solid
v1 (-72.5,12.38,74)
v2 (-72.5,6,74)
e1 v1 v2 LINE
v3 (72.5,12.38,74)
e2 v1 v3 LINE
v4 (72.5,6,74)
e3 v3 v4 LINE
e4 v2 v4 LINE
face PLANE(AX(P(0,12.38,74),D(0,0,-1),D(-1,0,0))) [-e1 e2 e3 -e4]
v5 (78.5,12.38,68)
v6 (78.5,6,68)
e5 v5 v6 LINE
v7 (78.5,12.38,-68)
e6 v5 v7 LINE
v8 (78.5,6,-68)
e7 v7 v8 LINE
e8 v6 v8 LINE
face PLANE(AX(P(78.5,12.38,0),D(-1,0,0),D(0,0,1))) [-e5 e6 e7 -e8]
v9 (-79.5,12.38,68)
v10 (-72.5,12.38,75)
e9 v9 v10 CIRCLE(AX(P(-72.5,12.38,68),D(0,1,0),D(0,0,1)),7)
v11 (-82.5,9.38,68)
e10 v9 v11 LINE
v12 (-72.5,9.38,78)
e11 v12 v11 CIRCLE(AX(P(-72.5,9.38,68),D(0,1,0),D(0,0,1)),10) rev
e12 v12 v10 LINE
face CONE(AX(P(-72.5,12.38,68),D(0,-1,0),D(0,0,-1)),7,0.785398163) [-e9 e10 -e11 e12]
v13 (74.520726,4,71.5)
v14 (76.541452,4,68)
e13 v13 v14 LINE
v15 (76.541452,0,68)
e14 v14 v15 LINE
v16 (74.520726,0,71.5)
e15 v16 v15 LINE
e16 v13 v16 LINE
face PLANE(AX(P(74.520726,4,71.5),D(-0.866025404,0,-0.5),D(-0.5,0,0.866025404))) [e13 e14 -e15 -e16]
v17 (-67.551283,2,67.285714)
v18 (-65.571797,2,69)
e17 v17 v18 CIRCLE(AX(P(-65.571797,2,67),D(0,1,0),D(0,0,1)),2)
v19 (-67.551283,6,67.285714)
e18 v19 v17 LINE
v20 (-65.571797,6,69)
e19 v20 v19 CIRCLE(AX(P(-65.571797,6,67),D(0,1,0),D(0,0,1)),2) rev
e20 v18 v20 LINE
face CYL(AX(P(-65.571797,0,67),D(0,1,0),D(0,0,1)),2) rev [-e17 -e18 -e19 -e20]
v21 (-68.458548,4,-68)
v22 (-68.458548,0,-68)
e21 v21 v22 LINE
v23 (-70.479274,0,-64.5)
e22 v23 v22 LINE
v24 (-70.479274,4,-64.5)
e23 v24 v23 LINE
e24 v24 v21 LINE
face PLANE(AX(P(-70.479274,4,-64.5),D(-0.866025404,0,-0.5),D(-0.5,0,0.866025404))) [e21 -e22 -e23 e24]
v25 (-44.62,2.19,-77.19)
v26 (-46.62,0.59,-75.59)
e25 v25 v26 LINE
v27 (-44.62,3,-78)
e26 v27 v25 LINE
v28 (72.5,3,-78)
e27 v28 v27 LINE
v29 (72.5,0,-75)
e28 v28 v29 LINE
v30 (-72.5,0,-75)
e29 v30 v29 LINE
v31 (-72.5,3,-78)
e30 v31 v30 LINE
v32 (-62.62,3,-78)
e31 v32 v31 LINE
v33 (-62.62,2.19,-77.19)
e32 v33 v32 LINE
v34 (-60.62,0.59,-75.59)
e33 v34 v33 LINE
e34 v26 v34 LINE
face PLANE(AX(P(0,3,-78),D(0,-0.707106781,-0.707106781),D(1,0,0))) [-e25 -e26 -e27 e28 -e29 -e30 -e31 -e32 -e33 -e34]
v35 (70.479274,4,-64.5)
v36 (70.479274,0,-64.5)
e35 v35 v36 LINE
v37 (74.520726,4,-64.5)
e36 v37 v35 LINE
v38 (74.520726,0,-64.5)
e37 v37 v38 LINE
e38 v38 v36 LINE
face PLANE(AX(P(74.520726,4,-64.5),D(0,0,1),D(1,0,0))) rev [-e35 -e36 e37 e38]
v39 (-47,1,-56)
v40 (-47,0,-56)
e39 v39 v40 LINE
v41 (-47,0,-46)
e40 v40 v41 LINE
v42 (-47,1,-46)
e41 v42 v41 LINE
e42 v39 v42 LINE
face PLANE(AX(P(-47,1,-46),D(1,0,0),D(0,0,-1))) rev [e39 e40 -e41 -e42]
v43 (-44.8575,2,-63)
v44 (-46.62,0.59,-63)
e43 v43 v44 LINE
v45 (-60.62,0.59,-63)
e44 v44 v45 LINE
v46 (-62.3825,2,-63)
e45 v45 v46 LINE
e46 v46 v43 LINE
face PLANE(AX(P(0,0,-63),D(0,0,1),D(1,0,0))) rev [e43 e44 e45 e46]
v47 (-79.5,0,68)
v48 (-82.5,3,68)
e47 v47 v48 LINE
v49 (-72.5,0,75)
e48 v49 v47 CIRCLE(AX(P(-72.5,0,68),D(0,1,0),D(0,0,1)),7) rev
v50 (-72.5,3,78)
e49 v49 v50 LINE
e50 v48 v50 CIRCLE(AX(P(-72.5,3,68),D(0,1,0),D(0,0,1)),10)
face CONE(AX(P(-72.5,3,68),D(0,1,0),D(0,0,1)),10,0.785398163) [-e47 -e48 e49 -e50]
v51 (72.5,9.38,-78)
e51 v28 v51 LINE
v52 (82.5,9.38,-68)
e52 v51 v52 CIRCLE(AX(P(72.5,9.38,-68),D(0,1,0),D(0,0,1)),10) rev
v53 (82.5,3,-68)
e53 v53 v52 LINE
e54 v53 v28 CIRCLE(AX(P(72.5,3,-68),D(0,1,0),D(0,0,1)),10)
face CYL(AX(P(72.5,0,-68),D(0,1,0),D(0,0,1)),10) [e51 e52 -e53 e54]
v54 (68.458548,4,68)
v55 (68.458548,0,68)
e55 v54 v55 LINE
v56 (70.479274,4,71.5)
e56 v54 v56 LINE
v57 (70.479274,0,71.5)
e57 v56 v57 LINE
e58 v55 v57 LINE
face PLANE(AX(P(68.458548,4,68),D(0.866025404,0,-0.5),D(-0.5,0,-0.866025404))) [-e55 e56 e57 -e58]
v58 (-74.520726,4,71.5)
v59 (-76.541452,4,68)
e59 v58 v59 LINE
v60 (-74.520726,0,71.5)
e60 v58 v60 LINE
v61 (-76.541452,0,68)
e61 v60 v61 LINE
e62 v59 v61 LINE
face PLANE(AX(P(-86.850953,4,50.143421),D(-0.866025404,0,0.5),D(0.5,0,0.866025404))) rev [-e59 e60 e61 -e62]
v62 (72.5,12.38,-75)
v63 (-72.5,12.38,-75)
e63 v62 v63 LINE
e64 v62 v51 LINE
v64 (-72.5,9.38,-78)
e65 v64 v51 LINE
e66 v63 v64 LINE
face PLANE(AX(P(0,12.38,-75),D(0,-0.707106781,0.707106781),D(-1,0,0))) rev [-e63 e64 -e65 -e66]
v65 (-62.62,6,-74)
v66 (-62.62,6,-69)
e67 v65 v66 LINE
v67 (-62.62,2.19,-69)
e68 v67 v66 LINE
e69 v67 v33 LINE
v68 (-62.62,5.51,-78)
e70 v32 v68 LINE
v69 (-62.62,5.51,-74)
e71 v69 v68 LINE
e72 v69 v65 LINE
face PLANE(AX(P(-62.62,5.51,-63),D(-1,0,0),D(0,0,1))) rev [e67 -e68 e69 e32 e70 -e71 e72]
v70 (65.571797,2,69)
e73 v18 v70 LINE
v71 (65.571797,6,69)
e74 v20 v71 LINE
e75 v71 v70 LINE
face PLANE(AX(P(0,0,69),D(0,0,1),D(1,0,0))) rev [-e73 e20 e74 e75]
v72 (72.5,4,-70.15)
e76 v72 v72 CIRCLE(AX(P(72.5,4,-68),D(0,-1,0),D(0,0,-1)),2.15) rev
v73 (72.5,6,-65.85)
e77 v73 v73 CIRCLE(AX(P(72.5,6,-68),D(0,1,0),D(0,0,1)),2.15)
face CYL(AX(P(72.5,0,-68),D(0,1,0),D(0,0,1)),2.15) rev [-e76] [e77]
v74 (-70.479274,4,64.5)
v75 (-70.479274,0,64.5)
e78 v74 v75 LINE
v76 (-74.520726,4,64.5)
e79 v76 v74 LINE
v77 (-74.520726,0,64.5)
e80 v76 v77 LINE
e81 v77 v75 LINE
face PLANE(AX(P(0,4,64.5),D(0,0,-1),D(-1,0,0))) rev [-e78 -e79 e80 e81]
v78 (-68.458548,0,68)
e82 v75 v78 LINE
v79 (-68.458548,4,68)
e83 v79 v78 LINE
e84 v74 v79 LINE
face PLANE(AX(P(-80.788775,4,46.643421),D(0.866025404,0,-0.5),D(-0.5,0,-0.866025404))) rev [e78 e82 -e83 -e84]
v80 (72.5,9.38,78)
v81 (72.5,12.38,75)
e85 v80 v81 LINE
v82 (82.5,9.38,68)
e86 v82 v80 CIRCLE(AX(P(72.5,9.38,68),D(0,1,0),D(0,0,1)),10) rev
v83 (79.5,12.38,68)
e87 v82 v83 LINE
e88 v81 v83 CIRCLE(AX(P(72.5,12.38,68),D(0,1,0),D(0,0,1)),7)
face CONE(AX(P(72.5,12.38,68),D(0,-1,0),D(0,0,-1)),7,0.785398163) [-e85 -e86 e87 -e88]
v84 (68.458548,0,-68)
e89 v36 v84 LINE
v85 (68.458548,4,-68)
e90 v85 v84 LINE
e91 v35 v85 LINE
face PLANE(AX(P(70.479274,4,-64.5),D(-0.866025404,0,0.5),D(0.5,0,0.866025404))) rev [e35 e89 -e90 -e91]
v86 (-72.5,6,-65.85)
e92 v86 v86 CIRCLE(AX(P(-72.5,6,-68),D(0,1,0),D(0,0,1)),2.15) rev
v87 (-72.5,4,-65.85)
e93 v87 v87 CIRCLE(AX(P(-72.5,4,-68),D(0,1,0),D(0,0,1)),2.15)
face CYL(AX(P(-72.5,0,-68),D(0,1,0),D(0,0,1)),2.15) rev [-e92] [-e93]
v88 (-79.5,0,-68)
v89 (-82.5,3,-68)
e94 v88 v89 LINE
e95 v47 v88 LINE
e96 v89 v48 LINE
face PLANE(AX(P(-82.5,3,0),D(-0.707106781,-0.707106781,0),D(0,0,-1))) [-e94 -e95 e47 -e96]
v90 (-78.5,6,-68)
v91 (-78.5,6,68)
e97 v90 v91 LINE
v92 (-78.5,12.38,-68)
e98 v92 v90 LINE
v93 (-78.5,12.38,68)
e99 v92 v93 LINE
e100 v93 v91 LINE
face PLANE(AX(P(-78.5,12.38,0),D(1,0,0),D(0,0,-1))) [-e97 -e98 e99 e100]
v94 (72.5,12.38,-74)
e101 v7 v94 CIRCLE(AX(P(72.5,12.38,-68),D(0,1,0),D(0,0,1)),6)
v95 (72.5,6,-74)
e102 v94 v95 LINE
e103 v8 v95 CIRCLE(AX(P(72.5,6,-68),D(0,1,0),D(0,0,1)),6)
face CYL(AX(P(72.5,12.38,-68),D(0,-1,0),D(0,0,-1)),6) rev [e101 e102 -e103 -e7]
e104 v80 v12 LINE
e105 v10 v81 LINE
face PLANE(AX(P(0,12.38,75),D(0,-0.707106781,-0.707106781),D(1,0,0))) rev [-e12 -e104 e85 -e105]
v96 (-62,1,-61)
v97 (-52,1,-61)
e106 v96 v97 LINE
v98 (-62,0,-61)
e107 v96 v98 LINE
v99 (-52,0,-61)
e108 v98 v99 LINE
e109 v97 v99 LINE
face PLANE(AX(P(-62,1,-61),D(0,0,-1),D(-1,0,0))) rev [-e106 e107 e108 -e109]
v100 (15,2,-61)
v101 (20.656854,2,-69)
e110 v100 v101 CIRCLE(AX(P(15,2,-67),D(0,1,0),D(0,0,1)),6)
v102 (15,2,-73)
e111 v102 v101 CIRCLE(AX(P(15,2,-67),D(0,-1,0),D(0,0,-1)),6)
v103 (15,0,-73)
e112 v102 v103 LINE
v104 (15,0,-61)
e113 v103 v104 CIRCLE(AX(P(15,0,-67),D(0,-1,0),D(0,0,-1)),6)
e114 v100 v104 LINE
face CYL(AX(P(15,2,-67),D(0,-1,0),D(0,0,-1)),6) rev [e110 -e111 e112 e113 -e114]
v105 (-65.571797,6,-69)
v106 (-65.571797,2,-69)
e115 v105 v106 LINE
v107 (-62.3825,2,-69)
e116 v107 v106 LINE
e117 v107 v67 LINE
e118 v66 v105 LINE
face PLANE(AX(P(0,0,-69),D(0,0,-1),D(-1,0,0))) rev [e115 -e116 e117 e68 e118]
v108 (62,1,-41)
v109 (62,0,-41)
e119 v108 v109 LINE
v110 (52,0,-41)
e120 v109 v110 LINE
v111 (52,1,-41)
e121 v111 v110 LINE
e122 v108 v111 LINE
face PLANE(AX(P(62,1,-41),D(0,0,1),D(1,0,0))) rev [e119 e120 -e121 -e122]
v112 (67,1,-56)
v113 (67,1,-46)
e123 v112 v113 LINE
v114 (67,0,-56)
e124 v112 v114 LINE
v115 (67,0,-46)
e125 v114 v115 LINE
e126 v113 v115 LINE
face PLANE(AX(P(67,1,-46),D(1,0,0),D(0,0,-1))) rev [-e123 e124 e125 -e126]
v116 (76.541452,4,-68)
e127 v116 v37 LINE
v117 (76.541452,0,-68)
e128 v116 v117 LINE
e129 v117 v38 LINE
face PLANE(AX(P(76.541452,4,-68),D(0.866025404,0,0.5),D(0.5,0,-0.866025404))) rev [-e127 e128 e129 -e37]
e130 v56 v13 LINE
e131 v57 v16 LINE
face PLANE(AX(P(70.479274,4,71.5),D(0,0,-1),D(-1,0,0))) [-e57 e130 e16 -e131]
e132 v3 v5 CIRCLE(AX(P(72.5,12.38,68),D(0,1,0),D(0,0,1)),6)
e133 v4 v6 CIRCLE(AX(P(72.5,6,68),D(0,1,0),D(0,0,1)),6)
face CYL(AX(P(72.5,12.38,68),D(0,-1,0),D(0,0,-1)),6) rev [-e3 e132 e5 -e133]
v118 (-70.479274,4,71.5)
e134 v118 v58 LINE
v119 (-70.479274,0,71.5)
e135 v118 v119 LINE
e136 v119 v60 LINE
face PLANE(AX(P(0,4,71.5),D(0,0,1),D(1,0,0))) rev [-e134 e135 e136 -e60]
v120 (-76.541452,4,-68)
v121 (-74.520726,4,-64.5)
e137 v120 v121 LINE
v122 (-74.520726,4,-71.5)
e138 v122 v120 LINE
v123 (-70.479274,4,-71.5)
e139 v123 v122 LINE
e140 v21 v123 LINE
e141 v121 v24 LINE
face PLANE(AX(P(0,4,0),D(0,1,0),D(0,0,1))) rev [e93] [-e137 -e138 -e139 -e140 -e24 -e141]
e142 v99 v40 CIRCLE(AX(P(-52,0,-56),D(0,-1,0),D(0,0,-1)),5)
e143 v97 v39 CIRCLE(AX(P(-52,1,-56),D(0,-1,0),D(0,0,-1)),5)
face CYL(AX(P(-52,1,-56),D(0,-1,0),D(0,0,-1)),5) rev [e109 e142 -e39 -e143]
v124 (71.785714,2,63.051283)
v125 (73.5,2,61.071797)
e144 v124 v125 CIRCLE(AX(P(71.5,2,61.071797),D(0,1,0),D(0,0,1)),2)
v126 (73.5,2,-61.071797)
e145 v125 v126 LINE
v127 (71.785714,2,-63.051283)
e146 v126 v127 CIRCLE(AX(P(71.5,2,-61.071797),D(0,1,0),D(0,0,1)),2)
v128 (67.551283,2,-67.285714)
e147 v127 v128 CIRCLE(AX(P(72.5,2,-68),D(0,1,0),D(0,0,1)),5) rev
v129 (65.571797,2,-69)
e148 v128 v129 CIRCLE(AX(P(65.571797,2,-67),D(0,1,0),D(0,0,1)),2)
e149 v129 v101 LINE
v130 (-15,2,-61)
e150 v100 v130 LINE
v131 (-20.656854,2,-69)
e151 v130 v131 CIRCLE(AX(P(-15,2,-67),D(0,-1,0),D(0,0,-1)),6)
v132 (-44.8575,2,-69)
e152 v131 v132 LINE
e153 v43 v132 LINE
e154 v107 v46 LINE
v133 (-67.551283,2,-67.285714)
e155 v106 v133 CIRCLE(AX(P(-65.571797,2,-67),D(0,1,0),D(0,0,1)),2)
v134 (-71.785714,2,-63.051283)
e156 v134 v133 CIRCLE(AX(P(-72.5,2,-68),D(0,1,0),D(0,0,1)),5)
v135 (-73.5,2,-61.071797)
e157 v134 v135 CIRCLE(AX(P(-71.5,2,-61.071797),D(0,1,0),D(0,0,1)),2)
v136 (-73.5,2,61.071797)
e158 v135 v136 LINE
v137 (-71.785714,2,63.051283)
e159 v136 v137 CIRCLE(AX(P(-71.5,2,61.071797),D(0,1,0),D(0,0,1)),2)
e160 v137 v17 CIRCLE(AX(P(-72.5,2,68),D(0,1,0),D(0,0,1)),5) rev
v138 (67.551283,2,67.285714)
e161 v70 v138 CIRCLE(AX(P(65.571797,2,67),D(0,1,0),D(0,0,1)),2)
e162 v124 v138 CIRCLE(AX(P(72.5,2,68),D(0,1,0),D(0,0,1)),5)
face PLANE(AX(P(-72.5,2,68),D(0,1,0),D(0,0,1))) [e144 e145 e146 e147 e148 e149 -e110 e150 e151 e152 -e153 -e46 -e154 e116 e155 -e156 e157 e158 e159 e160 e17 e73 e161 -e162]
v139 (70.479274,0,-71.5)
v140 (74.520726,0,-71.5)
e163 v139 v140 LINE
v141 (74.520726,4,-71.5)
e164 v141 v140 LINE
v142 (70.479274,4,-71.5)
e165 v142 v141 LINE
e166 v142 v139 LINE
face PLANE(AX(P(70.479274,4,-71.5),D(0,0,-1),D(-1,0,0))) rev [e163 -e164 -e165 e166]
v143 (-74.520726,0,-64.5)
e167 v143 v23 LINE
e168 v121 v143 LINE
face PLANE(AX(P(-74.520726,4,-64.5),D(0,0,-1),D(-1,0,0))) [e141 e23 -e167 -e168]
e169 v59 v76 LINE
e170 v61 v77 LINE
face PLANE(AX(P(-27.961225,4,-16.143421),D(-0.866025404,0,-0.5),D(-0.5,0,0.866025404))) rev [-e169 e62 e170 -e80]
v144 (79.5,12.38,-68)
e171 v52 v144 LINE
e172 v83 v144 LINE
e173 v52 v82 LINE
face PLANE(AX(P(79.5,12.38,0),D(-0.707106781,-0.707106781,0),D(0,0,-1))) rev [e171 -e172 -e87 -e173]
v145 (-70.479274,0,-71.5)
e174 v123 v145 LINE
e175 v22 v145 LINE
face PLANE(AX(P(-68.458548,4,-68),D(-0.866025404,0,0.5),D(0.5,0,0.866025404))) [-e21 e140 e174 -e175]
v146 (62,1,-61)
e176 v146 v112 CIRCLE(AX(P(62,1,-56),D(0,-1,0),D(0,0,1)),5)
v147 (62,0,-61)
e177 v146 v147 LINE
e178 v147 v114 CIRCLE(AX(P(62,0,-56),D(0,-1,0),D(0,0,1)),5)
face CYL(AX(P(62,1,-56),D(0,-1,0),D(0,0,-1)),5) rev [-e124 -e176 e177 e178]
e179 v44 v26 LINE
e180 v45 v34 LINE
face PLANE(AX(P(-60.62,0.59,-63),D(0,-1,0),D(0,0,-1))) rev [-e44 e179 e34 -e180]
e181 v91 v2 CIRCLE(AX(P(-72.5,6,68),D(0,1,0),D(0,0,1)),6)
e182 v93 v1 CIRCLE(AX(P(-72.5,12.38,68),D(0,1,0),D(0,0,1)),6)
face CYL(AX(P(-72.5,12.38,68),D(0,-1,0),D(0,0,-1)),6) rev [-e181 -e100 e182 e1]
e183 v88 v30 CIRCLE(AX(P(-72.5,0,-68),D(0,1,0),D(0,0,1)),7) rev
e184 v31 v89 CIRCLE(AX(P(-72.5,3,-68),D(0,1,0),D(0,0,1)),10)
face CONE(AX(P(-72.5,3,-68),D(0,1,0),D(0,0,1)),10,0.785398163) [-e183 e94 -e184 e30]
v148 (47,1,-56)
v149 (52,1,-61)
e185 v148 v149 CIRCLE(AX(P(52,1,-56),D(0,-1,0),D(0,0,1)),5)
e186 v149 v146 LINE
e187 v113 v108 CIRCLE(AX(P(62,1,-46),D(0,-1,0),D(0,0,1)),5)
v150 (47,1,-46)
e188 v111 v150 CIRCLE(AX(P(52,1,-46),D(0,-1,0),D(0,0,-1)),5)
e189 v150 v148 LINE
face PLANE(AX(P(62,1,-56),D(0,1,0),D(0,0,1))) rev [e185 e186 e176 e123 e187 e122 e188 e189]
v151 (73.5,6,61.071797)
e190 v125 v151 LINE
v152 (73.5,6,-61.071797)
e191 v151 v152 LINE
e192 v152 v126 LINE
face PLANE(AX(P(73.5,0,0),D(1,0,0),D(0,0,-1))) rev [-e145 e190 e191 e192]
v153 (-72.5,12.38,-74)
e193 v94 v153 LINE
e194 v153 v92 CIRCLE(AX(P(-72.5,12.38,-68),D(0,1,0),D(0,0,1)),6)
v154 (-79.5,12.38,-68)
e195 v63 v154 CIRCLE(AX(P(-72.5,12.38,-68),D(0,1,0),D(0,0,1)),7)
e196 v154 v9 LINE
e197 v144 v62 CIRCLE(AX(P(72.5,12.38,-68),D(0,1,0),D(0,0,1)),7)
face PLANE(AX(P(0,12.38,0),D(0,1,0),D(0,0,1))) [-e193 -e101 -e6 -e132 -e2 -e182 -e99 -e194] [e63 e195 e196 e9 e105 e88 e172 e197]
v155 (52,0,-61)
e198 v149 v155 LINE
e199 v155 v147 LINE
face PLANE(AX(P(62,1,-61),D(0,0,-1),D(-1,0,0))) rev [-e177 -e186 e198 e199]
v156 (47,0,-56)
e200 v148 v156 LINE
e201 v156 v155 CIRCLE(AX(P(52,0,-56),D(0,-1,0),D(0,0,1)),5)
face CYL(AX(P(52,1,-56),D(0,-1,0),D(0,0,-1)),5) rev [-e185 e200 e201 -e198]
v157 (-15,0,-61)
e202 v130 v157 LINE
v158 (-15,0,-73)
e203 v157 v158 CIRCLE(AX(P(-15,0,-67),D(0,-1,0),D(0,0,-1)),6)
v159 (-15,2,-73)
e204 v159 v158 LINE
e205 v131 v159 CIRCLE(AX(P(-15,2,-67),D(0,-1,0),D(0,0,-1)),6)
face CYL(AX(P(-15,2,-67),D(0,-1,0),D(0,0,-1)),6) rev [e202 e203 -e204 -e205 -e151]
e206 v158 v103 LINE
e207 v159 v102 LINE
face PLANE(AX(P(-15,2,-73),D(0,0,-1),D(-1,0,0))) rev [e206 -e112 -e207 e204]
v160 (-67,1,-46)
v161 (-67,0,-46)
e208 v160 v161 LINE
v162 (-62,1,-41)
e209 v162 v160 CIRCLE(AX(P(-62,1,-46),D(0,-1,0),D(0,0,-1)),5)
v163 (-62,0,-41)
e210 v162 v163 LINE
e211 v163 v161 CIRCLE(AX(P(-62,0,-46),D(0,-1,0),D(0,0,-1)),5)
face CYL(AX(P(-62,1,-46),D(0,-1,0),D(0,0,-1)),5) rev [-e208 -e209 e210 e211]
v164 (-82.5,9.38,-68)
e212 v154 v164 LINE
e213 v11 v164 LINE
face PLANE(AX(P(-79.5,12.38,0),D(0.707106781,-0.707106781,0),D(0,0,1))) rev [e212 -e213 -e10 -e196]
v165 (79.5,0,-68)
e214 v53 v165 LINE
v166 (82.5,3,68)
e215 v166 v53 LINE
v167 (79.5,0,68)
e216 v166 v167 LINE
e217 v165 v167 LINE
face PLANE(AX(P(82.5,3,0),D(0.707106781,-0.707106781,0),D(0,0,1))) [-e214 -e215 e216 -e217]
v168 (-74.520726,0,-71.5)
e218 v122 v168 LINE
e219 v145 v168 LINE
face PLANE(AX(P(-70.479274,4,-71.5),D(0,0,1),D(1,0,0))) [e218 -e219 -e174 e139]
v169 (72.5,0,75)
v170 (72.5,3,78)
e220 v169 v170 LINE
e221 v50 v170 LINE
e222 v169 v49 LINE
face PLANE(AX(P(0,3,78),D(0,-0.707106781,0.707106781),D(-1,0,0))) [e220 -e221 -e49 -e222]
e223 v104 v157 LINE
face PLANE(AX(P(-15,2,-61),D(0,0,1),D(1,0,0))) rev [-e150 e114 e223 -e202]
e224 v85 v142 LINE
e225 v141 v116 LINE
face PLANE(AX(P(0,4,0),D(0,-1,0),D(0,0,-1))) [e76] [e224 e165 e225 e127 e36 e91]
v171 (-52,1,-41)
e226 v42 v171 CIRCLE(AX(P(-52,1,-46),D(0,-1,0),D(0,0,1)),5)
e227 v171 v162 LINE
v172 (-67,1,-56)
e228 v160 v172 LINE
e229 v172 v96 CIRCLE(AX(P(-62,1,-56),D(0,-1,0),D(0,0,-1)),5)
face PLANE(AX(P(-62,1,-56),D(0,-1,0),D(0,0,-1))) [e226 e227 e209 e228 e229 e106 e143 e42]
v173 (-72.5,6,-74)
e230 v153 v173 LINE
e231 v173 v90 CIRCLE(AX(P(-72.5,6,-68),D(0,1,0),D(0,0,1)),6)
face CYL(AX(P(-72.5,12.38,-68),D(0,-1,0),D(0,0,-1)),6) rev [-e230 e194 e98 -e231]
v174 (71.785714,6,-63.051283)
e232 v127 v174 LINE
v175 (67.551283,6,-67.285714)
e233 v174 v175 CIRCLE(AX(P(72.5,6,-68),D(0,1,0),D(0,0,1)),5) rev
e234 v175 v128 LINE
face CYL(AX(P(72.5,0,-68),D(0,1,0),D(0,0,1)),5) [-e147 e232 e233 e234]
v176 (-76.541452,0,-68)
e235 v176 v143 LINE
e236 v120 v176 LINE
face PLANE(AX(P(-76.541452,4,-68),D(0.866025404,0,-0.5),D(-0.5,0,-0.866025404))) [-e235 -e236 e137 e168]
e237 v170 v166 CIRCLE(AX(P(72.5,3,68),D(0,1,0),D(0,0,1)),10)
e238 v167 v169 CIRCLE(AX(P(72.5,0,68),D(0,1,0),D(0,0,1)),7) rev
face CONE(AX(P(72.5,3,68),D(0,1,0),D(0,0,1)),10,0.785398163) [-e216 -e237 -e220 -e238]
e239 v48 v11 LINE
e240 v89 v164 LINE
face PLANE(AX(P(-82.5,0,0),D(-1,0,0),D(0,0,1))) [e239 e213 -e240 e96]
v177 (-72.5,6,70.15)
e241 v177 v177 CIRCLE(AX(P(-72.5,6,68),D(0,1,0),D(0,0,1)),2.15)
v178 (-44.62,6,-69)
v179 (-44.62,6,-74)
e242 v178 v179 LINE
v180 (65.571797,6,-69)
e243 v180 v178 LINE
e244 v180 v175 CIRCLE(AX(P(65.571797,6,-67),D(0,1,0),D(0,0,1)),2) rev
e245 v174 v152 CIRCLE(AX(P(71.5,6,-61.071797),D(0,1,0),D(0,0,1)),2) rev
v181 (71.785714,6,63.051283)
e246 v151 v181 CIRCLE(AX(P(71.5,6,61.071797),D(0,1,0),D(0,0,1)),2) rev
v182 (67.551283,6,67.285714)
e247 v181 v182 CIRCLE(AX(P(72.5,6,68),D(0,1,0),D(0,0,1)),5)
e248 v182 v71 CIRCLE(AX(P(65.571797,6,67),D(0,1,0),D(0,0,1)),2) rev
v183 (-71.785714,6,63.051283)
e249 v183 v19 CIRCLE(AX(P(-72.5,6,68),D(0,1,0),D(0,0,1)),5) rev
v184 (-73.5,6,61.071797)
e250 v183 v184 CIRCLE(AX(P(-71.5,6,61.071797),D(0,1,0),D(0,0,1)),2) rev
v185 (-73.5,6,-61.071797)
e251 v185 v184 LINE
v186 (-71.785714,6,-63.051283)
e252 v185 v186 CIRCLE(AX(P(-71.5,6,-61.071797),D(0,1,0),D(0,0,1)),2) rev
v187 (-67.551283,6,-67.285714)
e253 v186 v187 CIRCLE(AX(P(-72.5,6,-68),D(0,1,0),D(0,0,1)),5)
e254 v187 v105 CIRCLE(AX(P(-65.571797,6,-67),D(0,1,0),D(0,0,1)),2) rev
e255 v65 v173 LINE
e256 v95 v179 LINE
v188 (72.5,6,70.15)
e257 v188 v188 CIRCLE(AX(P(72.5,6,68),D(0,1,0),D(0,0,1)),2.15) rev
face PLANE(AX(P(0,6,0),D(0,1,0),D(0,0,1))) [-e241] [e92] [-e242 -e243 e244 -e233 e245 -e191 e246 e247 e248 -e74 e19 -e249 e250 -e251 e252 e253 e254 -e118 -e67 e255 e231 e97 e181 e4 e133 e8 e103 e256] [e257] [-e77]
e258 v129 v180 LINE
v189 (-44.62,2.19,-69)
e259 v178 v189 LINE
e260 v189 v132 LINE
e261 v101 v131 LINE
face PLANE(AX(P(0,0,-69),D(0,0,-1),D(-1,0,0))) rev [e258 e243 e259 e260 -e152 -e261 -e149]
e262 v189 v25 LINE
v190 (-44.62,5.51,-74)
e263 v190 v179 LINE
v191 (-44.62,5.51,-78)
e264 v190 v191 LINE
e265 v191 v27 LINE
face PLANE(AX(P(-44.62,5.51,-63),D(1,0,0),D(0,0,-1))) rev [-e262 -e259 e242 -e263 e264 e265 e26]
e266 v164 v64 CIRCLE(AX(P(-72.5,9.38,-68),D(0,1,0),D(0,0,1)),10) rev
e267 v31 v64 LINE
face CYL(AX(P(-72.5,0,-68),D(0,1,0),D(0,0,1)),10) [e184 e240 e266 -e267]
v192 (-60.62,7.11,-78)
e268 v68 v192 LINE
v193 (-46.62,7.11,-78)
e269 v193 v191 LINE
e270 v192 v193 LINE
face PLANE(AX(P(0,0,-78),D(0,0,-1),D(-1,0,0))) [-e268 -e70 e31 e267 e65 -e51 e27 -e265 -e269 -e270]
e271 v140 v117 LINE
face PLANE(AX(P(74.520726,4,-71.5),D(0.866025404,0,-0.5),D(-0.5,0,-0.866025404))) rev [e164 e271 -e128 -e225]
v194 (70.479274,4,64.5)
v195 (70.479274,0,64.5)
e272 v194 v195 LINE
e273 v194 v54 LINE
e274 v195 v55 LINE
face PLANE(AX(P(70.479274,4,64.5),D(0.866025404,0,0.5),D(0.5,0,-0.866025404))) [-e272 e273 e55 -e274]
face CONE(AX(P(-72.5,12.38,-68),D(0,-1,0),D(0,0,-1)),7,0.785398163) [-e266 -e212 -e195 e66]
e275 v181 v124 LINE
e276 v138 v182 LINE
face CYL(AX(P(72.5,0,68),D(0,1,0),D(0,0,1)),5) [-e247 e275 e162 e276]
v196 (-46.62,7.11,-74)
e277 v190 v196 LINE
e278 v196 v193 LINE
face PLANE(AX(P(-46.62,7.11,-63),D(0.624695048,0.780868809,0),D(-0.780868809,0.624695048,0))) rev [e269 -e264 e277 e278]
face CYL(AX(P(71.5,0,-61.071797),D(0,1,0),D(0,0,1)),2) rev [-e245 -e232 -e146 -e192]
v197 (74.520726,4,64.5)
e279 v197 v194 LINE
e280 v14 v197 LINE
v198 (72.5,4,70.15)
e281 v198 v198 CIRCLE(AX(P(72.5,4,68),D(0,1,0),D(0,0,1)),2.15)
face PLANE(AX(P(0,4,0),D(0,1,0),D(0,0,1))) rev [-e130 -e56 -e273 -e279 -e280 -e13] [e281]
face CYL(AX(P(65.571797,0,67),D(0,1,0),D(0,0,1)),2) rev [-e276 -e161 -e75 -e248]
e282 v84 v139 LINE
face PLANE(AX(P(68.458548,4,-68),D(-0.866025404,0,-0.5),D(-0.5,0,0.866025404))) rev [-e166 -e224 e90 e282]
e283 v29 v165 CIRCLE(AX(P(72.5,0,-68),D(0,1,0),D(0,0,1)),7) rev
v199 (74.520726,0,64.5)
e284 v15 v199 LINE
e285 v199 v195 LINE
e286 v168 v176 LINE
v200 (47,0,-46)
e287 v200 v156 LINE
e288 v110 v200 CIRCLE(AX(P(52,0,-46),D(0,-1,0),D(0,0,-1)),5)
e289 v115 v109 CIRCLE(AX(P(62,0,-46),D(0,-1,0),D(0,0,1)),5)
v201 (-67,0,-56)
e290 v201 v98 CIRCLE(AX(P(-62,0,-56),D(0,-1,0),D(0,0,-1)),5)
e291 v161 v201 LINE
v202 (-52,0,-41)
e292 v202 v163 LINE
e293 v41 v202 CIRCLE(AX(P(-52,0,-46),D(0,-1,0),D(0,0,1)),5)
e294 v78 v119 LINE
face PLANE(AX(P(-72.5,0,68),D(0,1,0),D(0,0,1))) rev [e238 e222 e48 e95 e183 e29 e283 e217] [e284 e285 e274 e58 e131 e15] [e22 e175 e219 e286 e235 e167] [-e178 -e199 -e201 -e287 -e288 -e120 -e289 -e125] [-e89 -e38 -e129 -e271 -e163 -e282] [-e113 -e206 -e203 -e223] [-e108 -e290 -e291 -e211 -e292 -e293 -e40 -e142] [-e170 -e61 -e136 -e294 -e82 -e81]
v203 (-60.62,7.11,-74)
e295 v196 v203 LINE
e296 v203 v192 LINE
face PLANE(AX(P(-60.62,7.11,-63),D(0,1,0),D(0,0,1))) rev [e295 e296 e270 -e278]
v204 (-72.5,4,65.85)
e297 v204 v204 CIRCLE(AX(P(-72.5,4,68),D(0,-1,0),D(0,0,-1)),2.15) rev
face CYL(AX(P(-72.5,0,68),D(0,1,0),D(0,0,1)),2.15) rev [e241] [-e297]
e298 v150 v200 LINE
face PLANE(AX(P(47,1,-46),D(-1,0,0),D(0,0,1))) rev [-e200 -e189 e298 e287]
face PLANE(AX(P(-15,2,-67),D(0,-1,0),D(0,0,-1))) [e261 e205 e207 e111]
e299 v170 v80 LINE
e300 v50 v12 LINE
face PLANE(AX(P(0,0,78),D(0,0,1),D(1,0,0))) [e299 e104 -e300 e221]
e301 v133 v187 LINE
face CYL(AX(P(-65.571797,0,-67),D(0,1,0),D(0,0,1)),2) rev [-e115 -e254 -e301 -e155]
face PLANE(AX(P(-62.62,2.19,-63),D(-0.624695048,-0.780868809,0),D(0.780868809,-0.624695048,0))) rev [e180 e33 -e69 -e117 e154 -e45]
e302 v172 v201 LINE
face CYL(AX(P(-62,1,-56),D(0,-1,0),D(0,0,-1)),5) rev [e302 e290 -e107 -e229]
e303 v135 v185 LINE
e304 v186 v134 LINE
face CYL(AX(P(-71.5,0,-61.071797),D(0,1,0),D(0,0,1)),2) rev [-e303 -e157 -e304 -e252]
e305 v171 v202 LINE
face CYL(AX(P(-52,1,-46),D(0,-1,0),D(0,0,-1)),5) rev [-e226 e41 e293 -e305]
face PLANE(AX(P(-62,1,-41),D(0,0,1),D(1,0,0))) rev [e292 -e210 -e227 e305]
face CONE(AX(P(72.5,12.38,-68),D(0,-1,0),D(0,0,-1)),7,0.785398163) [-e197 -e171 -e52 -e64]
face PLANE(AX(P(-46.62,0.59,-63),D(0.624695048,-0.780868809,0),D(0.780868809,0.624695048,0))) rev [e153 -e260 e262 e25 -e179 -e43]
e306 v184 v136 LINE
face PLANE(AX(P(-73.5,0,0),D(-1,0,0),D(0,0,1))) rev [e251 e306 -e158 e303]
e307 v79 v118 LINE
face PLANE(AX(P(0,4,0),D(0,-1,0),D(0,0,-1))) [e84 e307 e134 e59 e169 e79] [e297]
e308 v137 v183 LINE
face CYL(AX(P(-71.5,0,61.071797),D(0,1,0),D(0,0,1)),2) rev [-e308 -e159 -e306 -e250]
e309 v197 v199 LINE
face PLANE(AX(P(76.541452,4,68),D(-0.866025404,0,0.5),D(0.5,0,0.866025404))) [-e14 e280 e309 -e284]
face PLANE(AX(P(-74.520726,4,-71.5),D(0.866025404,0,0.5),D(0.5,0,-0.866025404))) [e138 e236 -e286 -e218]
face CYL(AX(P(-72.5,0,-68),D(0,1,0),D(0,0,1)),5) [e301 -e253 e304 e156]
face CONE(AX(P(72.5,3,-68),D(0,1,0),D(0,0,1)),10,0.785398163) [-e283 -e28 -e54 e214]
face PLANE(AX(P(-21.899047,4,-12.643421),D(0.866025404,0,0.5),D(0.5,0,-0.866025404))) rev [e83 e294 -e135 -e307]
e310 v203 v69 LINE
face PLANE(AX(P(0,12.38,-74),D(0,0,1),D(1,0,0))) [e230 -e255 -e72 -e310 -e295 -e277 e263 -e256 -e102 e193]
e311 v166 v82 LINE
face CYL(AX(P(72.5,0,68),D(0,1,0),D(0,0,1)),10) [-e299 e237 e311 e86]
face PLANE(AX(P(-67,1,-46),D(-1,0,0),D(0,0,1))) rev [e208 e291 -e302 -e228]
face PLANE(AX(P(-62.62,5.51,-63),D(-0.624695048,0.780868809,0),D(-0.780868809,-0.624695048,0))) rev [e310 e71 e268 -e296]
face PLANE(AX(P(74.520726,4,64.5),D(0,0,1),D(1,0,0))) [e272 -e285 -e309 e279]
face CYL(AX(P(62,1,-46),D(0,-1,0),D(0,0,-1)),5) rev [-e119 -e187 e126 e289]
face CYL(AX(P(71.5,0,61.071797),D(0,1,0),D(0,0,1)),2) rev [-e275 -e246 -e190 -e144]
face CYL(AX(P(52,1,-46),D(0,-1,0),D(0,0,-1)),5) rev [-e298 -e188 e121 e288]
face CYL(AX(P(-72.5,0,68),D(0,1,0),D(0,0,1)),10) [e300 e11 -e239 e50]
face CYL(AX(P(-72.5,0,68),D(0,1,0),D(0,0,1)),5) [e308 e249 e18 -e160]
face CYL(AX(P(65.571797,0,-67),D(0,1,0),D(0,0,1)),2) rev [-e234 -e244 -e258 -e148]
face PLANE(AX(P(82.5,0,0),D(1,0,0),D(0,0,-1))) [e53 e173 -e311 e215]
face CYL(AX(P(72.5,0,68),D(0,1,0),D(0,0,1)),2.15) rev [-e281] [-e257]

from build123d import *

# Parameters (mm, degrees)
BOSS_EXTRUDE2_DEPTH      = 2
BOSS_EXTRUDE3_DEPTH      = 4
BOSS_EXTRUDE3_DEPTH_BACK = 2
SKETCH3_R                = 2.15
BOSS_EXTRUDE4_DEPTH      = 6.38
CUT_EXTRUDE1_DEPTH       = 15
FILLET1_R                = 2
CUT_EXTRUDE3_DEPTH       = 115.008747033
CUT_EXTRUDE3_DEPTH_BACK  = 115.008747033
SKETCH11_R               = 2.15
CUT_EXTRUDE2_DEPTH       = 4
CHAMFER1_SIZE            = 3
SKETCH13_W               = 18
SKETCH13_H               = 5
CUT_EXTRUDE5_DEPTH       = 1
CUT_EXTRUDE6_DEPTH       = 1
CUT_EXTRUDE7_DEPTH       = 2


with BuildPart() as part:
    # Sketch2 → Boss-Extrude2 (new body)
    with BuildSketch(Plane(origin=(0, 0, 0), x_dir=(1, 0, 0), z_dir=(0, 1, 0))):
        with BuildLine():
            Line((-72.5, 74), (72.5, 74))
            ThreePointArc((72.5, 74), (76.742640687, 72.242640687), (78.5, 68))
            Line((78.5, 68), (78.5, -68))
            ThreePointArc((78.5, -68), (76.742640687, -72.242640687), (72.5, -74))
            Line((72.5, -74), (-72.5, -74))
            ThreePointArc((-72.5, -74), (-76.742640687, -72.242640687), (-78.5, -68))
            Line((-78.5, -68), (-78.5, 68))
            ThreePointArc((-78.5, 68), (-76.742640687, 72.242640687), (-72.5, 74))
        make_face()
    extrude(amount=BOSS_EXTRUDE2_DEPTH)

    # Sketch3 → Boss-Extrude3 (add, two sides: drawn at the far end of the back side and taken through both)
    with BuildSketch(Plane(origin=(0, 2, 0), x_dir=(1, 0, 0), z_dir=(0, 1, 0)).offset(-BOSS_EXTRUDE3_DEPTH_BACK)):
        with BuildLine():
            Line((-82.5, 68), (-82.5, -68))
            ThreePointArc((-82.5, -68), (-79.571067812, -75.071067812), (-72.5, -78))
            Line((-72.5, -78), (72.5, -78))
            ThreePointArc((72.5, -78), (79.571067812, -75.071067812), (82.5, -68))
            Line((82.5, -68), (82.5, 68))
            ThreePointArc((82.5, 68), (79.571067812, 75.071067812), (72.5, 78))
            Line((72.5, 78), (-72.5, 78))
            ThreePointArc((-72.5, 78), (-79.571067812, 75.071067812), (-82.5, 68))
        make_face()
        with Locations(Location((-72.5, -68, 0), (0, 0, 270))):
            Circle(SKETCH3_R, mode=Mode.SUBTRACT)
        with Locations(Location((72.5, -68, 0), (0, 0, 270))):
            Circle(SKETCH3_R, mode=Mode.SUBTRACT)
        with Locations(Location((72.5, 68, 0), (0, 0, 270))):
            Circle(SKETCH3_R, mode=Mode.SUBTRACT)
        with Locations(Location((-72.5, 68, 0), (0, 0, 270))):
            Circle(SKETCH3_R, mode=Mode.SUBTRACT)
        with BuildLine():
            Line((-73.5, 63), (-73.5, -63))
            Line((-73.5, -63), (-72.5, -63))
            ThreePointArc((-72.5, -63), (-68.964466094, -64.464466094), (-67.5, -68))
            Line((-67.5, -68), (-67.5, -69))
            Line((-67.5, -69), (67.5, -69))
            Line((67.5, -69), (67.5, -68))
            ThreePointArc((67.5, -68), (68.964466094, -64.464466094), (72.5, -63))
            Line((72.5, -63), (73.5, -63))
            Line((73.5, -63), (73.5, 63))
            Line((73.5, 63), (72.5, 63))
            ThreePointArc((72.5, 63), (68.964466094, 64.464466094), (67.5, 68))
            Line((67.5, 68), (67.5, 69))
            Line((67.5, 69), (-67.5, 69))
            Line((-67.5, 69), (-67.5, 68))
            ThreePointArc((-67.5, 68), (-68.964466094, 64.464466094), (-72.5, 63))
            Line((-72.5, 63), (-73.5, 63))
        make_face(mode=Mode.SUBTRACT)
    extrude(amount=BOSS_EXTRUDE3_DEPTH + BOSS_EXTRUDE3_DEPTH_BACK)

    # Sketch8 → Boss-Extrude4 (add)
    with BuildSketch(Plane(origin=(0, 6, 0), x_dir=(1, 0, 0), z_dir=(0, 1, 0))):
        with BuildLine():
            ThreePointArc((82.5, 68), (79.571067812, 75.071067812), (72.5, 78))
            Line((72.5, 78), (-72.5, 78))
            ThreePointArc((-72.5, 78), (-79.571067812, 75.071067812), (-82.5, 68))
            Line((-82.5, 68), (-82.5, -68))
            ThreePointArc((-82.5, -68), (-79.571067812, -75.071067812), (-72.5, -78))
            Line((-72.5, -78), (72.5, -78))
            ThreePointArc((72.5, -78), (79.571067812, -75.071067812), (82.5, -68))
            Line((82.5, -68), (82.5, 68))
        make_face()
        with BuildLine():
            ThreePointArc((72.5, -74), (76.742640687, -72.242640687), (78.5, -68))
            Line((78.5, -68), (78.5, 68))
            ThreePointArc((78.5, 68), (76.742640687, 72.242640687), (72.5, 74))
            Line((72.5, 74), (-72.5, 74))
            ThreePointArc((-72.5, 74), (-76.742640687, 72.242640687), (-78.5, 68))
            Line((-78.5, 68), (-78.5, -68))
            ThreePointArc((-78.5, -68), (-76.742640687, -72.242640687), (-72.5, -74))
            Line((-72.5, -74), (72.5, -74))
        make_face(mode=Mode.SUBTRACT)
    extrude(amount=BOSS_EXTRUDE4_DEPTH)

    # Sketch9 → Cut-Extrude1 (cut)
    with BuildSketch(Plane(origin=(0, 0, -78), x_dir=(-1, 0, 0), z_dir=(0, 0, -1))):
        Polygon((60.62, 7.11), (46.62, 7.11), (44.62, 5.51), (44.62, 2.19), (46.62, 0.59), (60.62, 0.59), (62.62, 2.19), (62.62, 5.51), align=None)
    extrude(amount=-CUT_EXTRUDE1_DEPTH, mode=Mode.SUBTRACT)

    # Fillet1
    fillet1_edges = [part.edges().sort_by_distance(p)[0] for p in [
        (-67.5, 4, -69),
        (-73.5, 4, -63),
        (-73.5, 4, 63),
        (-67.5, 4, 69),
        (73.5, 4, 63),
        (67.5, 4, 69),
        (67.5, 4, -69),
        (73.5, 4, -63),
    ]]
    fillet(fillet1_edges, radius=FILLET1_R)

    # Sketch11 → Cut-Extrude3 (cut, two sides: drawn at the far end of the back side and taken through both)
    with BuildSketch(Plane(origin=(0, 2, 0), x_dir=(1, 0, 0), z_dir=(0, 1, 0)).offset(-CUT_EXTRUDE3_DEPTH_BACK)):
        with Locations(Location((-72.5, -68, 0), (0, 0, 270))):
            Circle(SKETCH11_R)
        with Locations(Location((72.5, -68, 0), (0, 0, 270))):
            Circle(SKETCH11_R)
        with Locations(Location((72.5, 68, 0), (0, 0, 270))):
            Circle(SKETCH11_R)
        with Locations(Location((-72.5, 68, 0), (0, 0, 270))):
            Circle(SKETCH11_R)
    extrude(amount=CUT_EXTRUDE3_DEPTH + CUT_EXTRUDE3_DEPTH_BACK, mode=Mode.SUBTRACT)

    # Sketch10 → Cut-Extrude2 (cut)
    with BuildSketch(Plane.XZ):
        Polygon((-74.520725942, 64.5), (-70.479274058, 64.5), (-68.458548116, 68), (-70.479274058, 71.5), (-74.520725942, 71.5), (-76.541451884, 68), align=None)
        Polygon((76.541451884, 68), (74.520725942, 64.5), (70.479274058, 64.5), (68.458548116, 68), (70.479274058, 71.5), (74.520725942, 71.5), align=None)
        Polygon((-70.479274058, -64.5), (-68.458548116, -68), (-70.479274058, -71.5), (-74.520725942, -71.5), (-76.541451884, -68), (-74.520725942, -64.5), align=None)
        Polygon((76.541451884, -68), (74.520725942, -64.5), (70.479274058, -64.5), (68.458548116, -68), (70.479274058, -71.5), (74.520725942, -71.5), align=None)
    extrude(amount=-CUT_EXTRUDE2_DEPTH, mode=Mode.SUBTRACT)

    # Chamfer1
    # the kernel refuses this chamfer: 3 mm, written as the material it takes off along each edge
    with BuildSketch(Plane(origin=(-72.5, 12.38, 68), x_dir=(-1, 0, 0), z_dir=(0, 0, -1))) as chamfer1_piece_1:
        Polygon((10 - CHAMFER1_SIZE, 0), (10, -CHAMFER1_SIZE), (10, 0), align=None)
    revolve(axis=Axis((-72.5, 12.38, 68), (0, 1, 0)), revolution_arc=90, mode=Mode.SUBTRACT)
    with BuildSketch(Plane(origin=(-72.5, 12.38, 78), x_dir=(0, 0.02749587661058619, -0.9996219169112968), z_dir=(1, 0, 0)), Plane(origin=(72.5, 0, -78), x_dir=(0, 0.9996219169112968, -0.027495876610586778), z_dir=(-1, 0, 0))) as chamfer1_piece_2:
        Polygon((CHAMFER1_SIZE * 0.999621916911, -CHAMFER1_SIZE * 0.0274958766106), (-CHAMFER1_SIZE * 0.0274958766106, -CHAMFER1_SIZE * 0.999621916911), (0, 0), align=None)
    extrude(amount=145, mode=Mode.SUBTRACT)
    with BuildSketch(Plane(origin=(72.5, 12.38, 68), x_dir=(0, 0, 1), z_dir=(-1, 0, 0))) as chamfer1_piece_3:
        Polygon((10 - CHAMFER1_SIZE, 0), (10, -CHAMFER1_SIZE), (10, 0), align=None)
    revolve(axis=Axis((72.5, 12.38, 68), (0, 1, 0)), revolution_arc=90, mode=Mode.SUBTRACT)
    with BuildSketch(Plane(origin=(82.5, 12.38, 68), x_dir=(-0.9996219169112968, 0.02749587661058619, 0), z_dir=(0, 0, -1)), Plane(origin=(-82.5, 12.38, -68), x_dir=(0.9996219169112968, 0.02749587661058619, 0), z_dir=(0, 0, 1))) as chamfer1_piece_4:
        Polygon((CHAMFER1_SIZE * 0.999621916911, -CHAMFER1_SIZE * 0.0274958766106), (-CHAMFER1_SIZE * 0.0274958766106, -CHAMFER1_SIZE * 0.999621916911), (0, 0), align=None)
    extrude(amount=136, mode=Mode.SUBTRACT)
    with BuildSketch(Plane(origin=(72.5, 12.38, -68), x_dir=(1, 0, 0), z_dir=(0, 0, 1))) as chamfer1_piece_5:
        Polygon((10 - CHAMFER1_SIZE, 0), (10, -CHAMFER1_SIZE), (10, 0), align=None)
    revolve(axis=Axis((72.5, 12.38, -68), (0, 1, 0)), revolution_arc=90, mode=Mode.SUBTRACT)
    with BuildSketch(Plane(origin=(72.5, 12.38, -78), x_dir=(0, -0.9996219169112968, -0.02749587661058678), z_dir=(-1, 0, 0)), Plane(origin=(-72.5, 0, 78), x_dir=(0, -0.02749587661058636, -0.9996219169112968), z_dir=(1, 0, 0))) as chamfer1_piece_6:
        Polygon((CHAMFER1_SIZE * 0.999621916911, CHAMFER1_SIZE * 0.0274958766106), (-CHAMFER1_SIZE * 0.0274958766106, CHAMFER1_SIZE * 0.999621916911), (0, 0), align=None)
    extrude(amount=145, mode=Mode.SUBTRACT)
    with BuildSketch(Plane(origin=(-72.5, 12.38, -68), x_dir=(0, 0, -1), z_dir=(1, 0, 0))) as chamfer1_piece_7:
        Polygon((10 - CHAMFER1_SIZE, 0), (10, -CHAMFER1_SIZE), (10, 0), align=None)
    revolve(axis=Axis((-72.5, 12.38, -68), (0, 1, 0)), revolution_arc=90, mode=Mode.SUBTRACT)
    with BuildSketch(Plane(origin=(-72.5, 0, -68), x_dir=(0, 0, -1), z_dir=(1, 0, 0))) as chamfer1_piece_8:
        Polygon((10 - CHAMFER1_SIZE, 0), (10, CHAMFER1_SIZE), (10, 0), align=None)
    revolve(axis=Axis((-72.5, 0, -68), (0, 1, 0)), revolution_arc=90, mode=Mode.SUBTRACT)
    with BuildSketch(Plane(origin=(-82.5, 0, -68), x_dir=(0.9996219169112968, -0.02749587661058636, 0), z_dir=(0, 0, 1)), Plane(origin=(82.5, 0, 68), x_dir=(-0.9996219169112968, -0.02749587661058636, 0), z_dir=(0, 0, -1))) as chamfer1_piece_9:
        Polygon((CHAMFER1_SIZE * 0.999621916911, CHAMFER1_SIZE * 0.0274958766106), (-CHAMFER1_SIZE * 0.0274958766106, CHAMFER1_SIZE * 0.999621916911), (0, 0), align=None)
    extrude(amount=136, mode=Mode.SUBTRACT)
    with BuildSketch(Plane(origin=(-72.5, 0, 68), x_dir=(-1, 0, 0), z_dir=(0, 0, -1))) as chamfer1_piece_10:
        Polygon((10 - CHAMFER1_SIZE, 0), (10, CHAMFER1_SIZE), (10, 0), align=None)
    revolve(axis=Axis((-72.5, 0, 68), (0, 1, 0)), revolution_arc=90, mode=Mode.SUBTRACT)
    with BuildSketch(Plane(origin=(72.5, 0, 68), x_dir=(0, 0, 1), z_dir=(-1, 0, 0))) as chamfer1_piece_11:
        Polygon((10 - CHAMFER1_SIZE, 0), (10, CHAMFER1_SIZE), (10, 0), align=None)
    revolve(axis=Axis((72.5, 0, 68), (0, 1, 0)), revolution_arc=90, mode=Mode.SUBTRACT)
    with BuildSketch(Plane(origin=(72.5, 0, -68), x_dir=(1, 0, 0), z_dir=(0, 0, 1))) as chamfer1_piece_12:
        Polygon((10, CHAMFER1_SIZE), (10 - CHAMFER1_SIZE, 0), (10, 0), align=None)
    revolve(axis=Axis((72.5, 0, -68), (0, 1, 0)), revolution_arc=90, mode=Mode.SUBTRACT)

    # Sketch13 → Cut-Extrude5 (cut)
    with BuildSketch(Plane(origin=(0, 6, 0), x_dir=(1, 0, 0), z_dir=(0, 1, 0))):
        with Locations((-53.62, 71.5)):
            Rectangle(SKETCH13_W, SKETCH13_H)
    extrude(amount=-CUT_EXTRUDE5_DEPTH, mode=Mode.SUBTRACT)

    # Sketch14 → Cut-Extrude6 (cut)
    with BuildSketch(Plane.XZ):
        with BuildLine():
            Line((-62, -41), (-52, -41))
            ThreePointArc((-52, -41), (-48.464466094, -42.464466094), (-47, -46))
            Line((-47, -46), (-47, -56))
            ThreePointArc((-47, -56), (-48.464466094, -59.535533906), (-52, -61))
            Line((-52, -61), (-62, -61))
            ThreePointArc((-62, -61), (-65.535533906, -59.535533906), (-67, -56))
            Line((-67, -56), (-67, -46))
            ThreePointArc((-67, -46), (-65.535533906, -42.464466094), (-62, -41))
        make_face()
        with BuildLine():
            Line((62, -61), (52, -61))
            ThreePointArc((52, -61), (48.464466094, -59.535533906), (47, -56))
            Line((47, -56), (47, -46))
            ThreePointArc((47, -46), (48.464466094, -42.464466094), (52, -41))
            Line((52, -41), (62, -41))
            ThreePointArc((62, -41), (65.535533906, -42.464466094), (67, -46))
            Line((67, -46), (67, -56))
            ThreePointArc((67, -56), (65.535533906, -59.535533906), (62, -61))
        make_face()
    extrude(amount=-CUT_EXTRUDE6_DEPTH, mode=Mode.SUBTRACT)

    # Sketch15 → Cut-Extrude7 (cut)
    with BuildSketch(Plane.XZ):
        with BuildLine():
            Line((-15, -61), (15, -61))
            ThreePointArc((15, -61), (21, -67), (15, -73))
            Line((15, -73), (-15, -73))
            ThreePointArc((-15, -73), (-21, -67), (-15, -61))
        make_face()
    extrude(amount=-CUT_EXTRUDE7_DEPTH, mode=Mode.SUBTRACT)


solid = part.part
